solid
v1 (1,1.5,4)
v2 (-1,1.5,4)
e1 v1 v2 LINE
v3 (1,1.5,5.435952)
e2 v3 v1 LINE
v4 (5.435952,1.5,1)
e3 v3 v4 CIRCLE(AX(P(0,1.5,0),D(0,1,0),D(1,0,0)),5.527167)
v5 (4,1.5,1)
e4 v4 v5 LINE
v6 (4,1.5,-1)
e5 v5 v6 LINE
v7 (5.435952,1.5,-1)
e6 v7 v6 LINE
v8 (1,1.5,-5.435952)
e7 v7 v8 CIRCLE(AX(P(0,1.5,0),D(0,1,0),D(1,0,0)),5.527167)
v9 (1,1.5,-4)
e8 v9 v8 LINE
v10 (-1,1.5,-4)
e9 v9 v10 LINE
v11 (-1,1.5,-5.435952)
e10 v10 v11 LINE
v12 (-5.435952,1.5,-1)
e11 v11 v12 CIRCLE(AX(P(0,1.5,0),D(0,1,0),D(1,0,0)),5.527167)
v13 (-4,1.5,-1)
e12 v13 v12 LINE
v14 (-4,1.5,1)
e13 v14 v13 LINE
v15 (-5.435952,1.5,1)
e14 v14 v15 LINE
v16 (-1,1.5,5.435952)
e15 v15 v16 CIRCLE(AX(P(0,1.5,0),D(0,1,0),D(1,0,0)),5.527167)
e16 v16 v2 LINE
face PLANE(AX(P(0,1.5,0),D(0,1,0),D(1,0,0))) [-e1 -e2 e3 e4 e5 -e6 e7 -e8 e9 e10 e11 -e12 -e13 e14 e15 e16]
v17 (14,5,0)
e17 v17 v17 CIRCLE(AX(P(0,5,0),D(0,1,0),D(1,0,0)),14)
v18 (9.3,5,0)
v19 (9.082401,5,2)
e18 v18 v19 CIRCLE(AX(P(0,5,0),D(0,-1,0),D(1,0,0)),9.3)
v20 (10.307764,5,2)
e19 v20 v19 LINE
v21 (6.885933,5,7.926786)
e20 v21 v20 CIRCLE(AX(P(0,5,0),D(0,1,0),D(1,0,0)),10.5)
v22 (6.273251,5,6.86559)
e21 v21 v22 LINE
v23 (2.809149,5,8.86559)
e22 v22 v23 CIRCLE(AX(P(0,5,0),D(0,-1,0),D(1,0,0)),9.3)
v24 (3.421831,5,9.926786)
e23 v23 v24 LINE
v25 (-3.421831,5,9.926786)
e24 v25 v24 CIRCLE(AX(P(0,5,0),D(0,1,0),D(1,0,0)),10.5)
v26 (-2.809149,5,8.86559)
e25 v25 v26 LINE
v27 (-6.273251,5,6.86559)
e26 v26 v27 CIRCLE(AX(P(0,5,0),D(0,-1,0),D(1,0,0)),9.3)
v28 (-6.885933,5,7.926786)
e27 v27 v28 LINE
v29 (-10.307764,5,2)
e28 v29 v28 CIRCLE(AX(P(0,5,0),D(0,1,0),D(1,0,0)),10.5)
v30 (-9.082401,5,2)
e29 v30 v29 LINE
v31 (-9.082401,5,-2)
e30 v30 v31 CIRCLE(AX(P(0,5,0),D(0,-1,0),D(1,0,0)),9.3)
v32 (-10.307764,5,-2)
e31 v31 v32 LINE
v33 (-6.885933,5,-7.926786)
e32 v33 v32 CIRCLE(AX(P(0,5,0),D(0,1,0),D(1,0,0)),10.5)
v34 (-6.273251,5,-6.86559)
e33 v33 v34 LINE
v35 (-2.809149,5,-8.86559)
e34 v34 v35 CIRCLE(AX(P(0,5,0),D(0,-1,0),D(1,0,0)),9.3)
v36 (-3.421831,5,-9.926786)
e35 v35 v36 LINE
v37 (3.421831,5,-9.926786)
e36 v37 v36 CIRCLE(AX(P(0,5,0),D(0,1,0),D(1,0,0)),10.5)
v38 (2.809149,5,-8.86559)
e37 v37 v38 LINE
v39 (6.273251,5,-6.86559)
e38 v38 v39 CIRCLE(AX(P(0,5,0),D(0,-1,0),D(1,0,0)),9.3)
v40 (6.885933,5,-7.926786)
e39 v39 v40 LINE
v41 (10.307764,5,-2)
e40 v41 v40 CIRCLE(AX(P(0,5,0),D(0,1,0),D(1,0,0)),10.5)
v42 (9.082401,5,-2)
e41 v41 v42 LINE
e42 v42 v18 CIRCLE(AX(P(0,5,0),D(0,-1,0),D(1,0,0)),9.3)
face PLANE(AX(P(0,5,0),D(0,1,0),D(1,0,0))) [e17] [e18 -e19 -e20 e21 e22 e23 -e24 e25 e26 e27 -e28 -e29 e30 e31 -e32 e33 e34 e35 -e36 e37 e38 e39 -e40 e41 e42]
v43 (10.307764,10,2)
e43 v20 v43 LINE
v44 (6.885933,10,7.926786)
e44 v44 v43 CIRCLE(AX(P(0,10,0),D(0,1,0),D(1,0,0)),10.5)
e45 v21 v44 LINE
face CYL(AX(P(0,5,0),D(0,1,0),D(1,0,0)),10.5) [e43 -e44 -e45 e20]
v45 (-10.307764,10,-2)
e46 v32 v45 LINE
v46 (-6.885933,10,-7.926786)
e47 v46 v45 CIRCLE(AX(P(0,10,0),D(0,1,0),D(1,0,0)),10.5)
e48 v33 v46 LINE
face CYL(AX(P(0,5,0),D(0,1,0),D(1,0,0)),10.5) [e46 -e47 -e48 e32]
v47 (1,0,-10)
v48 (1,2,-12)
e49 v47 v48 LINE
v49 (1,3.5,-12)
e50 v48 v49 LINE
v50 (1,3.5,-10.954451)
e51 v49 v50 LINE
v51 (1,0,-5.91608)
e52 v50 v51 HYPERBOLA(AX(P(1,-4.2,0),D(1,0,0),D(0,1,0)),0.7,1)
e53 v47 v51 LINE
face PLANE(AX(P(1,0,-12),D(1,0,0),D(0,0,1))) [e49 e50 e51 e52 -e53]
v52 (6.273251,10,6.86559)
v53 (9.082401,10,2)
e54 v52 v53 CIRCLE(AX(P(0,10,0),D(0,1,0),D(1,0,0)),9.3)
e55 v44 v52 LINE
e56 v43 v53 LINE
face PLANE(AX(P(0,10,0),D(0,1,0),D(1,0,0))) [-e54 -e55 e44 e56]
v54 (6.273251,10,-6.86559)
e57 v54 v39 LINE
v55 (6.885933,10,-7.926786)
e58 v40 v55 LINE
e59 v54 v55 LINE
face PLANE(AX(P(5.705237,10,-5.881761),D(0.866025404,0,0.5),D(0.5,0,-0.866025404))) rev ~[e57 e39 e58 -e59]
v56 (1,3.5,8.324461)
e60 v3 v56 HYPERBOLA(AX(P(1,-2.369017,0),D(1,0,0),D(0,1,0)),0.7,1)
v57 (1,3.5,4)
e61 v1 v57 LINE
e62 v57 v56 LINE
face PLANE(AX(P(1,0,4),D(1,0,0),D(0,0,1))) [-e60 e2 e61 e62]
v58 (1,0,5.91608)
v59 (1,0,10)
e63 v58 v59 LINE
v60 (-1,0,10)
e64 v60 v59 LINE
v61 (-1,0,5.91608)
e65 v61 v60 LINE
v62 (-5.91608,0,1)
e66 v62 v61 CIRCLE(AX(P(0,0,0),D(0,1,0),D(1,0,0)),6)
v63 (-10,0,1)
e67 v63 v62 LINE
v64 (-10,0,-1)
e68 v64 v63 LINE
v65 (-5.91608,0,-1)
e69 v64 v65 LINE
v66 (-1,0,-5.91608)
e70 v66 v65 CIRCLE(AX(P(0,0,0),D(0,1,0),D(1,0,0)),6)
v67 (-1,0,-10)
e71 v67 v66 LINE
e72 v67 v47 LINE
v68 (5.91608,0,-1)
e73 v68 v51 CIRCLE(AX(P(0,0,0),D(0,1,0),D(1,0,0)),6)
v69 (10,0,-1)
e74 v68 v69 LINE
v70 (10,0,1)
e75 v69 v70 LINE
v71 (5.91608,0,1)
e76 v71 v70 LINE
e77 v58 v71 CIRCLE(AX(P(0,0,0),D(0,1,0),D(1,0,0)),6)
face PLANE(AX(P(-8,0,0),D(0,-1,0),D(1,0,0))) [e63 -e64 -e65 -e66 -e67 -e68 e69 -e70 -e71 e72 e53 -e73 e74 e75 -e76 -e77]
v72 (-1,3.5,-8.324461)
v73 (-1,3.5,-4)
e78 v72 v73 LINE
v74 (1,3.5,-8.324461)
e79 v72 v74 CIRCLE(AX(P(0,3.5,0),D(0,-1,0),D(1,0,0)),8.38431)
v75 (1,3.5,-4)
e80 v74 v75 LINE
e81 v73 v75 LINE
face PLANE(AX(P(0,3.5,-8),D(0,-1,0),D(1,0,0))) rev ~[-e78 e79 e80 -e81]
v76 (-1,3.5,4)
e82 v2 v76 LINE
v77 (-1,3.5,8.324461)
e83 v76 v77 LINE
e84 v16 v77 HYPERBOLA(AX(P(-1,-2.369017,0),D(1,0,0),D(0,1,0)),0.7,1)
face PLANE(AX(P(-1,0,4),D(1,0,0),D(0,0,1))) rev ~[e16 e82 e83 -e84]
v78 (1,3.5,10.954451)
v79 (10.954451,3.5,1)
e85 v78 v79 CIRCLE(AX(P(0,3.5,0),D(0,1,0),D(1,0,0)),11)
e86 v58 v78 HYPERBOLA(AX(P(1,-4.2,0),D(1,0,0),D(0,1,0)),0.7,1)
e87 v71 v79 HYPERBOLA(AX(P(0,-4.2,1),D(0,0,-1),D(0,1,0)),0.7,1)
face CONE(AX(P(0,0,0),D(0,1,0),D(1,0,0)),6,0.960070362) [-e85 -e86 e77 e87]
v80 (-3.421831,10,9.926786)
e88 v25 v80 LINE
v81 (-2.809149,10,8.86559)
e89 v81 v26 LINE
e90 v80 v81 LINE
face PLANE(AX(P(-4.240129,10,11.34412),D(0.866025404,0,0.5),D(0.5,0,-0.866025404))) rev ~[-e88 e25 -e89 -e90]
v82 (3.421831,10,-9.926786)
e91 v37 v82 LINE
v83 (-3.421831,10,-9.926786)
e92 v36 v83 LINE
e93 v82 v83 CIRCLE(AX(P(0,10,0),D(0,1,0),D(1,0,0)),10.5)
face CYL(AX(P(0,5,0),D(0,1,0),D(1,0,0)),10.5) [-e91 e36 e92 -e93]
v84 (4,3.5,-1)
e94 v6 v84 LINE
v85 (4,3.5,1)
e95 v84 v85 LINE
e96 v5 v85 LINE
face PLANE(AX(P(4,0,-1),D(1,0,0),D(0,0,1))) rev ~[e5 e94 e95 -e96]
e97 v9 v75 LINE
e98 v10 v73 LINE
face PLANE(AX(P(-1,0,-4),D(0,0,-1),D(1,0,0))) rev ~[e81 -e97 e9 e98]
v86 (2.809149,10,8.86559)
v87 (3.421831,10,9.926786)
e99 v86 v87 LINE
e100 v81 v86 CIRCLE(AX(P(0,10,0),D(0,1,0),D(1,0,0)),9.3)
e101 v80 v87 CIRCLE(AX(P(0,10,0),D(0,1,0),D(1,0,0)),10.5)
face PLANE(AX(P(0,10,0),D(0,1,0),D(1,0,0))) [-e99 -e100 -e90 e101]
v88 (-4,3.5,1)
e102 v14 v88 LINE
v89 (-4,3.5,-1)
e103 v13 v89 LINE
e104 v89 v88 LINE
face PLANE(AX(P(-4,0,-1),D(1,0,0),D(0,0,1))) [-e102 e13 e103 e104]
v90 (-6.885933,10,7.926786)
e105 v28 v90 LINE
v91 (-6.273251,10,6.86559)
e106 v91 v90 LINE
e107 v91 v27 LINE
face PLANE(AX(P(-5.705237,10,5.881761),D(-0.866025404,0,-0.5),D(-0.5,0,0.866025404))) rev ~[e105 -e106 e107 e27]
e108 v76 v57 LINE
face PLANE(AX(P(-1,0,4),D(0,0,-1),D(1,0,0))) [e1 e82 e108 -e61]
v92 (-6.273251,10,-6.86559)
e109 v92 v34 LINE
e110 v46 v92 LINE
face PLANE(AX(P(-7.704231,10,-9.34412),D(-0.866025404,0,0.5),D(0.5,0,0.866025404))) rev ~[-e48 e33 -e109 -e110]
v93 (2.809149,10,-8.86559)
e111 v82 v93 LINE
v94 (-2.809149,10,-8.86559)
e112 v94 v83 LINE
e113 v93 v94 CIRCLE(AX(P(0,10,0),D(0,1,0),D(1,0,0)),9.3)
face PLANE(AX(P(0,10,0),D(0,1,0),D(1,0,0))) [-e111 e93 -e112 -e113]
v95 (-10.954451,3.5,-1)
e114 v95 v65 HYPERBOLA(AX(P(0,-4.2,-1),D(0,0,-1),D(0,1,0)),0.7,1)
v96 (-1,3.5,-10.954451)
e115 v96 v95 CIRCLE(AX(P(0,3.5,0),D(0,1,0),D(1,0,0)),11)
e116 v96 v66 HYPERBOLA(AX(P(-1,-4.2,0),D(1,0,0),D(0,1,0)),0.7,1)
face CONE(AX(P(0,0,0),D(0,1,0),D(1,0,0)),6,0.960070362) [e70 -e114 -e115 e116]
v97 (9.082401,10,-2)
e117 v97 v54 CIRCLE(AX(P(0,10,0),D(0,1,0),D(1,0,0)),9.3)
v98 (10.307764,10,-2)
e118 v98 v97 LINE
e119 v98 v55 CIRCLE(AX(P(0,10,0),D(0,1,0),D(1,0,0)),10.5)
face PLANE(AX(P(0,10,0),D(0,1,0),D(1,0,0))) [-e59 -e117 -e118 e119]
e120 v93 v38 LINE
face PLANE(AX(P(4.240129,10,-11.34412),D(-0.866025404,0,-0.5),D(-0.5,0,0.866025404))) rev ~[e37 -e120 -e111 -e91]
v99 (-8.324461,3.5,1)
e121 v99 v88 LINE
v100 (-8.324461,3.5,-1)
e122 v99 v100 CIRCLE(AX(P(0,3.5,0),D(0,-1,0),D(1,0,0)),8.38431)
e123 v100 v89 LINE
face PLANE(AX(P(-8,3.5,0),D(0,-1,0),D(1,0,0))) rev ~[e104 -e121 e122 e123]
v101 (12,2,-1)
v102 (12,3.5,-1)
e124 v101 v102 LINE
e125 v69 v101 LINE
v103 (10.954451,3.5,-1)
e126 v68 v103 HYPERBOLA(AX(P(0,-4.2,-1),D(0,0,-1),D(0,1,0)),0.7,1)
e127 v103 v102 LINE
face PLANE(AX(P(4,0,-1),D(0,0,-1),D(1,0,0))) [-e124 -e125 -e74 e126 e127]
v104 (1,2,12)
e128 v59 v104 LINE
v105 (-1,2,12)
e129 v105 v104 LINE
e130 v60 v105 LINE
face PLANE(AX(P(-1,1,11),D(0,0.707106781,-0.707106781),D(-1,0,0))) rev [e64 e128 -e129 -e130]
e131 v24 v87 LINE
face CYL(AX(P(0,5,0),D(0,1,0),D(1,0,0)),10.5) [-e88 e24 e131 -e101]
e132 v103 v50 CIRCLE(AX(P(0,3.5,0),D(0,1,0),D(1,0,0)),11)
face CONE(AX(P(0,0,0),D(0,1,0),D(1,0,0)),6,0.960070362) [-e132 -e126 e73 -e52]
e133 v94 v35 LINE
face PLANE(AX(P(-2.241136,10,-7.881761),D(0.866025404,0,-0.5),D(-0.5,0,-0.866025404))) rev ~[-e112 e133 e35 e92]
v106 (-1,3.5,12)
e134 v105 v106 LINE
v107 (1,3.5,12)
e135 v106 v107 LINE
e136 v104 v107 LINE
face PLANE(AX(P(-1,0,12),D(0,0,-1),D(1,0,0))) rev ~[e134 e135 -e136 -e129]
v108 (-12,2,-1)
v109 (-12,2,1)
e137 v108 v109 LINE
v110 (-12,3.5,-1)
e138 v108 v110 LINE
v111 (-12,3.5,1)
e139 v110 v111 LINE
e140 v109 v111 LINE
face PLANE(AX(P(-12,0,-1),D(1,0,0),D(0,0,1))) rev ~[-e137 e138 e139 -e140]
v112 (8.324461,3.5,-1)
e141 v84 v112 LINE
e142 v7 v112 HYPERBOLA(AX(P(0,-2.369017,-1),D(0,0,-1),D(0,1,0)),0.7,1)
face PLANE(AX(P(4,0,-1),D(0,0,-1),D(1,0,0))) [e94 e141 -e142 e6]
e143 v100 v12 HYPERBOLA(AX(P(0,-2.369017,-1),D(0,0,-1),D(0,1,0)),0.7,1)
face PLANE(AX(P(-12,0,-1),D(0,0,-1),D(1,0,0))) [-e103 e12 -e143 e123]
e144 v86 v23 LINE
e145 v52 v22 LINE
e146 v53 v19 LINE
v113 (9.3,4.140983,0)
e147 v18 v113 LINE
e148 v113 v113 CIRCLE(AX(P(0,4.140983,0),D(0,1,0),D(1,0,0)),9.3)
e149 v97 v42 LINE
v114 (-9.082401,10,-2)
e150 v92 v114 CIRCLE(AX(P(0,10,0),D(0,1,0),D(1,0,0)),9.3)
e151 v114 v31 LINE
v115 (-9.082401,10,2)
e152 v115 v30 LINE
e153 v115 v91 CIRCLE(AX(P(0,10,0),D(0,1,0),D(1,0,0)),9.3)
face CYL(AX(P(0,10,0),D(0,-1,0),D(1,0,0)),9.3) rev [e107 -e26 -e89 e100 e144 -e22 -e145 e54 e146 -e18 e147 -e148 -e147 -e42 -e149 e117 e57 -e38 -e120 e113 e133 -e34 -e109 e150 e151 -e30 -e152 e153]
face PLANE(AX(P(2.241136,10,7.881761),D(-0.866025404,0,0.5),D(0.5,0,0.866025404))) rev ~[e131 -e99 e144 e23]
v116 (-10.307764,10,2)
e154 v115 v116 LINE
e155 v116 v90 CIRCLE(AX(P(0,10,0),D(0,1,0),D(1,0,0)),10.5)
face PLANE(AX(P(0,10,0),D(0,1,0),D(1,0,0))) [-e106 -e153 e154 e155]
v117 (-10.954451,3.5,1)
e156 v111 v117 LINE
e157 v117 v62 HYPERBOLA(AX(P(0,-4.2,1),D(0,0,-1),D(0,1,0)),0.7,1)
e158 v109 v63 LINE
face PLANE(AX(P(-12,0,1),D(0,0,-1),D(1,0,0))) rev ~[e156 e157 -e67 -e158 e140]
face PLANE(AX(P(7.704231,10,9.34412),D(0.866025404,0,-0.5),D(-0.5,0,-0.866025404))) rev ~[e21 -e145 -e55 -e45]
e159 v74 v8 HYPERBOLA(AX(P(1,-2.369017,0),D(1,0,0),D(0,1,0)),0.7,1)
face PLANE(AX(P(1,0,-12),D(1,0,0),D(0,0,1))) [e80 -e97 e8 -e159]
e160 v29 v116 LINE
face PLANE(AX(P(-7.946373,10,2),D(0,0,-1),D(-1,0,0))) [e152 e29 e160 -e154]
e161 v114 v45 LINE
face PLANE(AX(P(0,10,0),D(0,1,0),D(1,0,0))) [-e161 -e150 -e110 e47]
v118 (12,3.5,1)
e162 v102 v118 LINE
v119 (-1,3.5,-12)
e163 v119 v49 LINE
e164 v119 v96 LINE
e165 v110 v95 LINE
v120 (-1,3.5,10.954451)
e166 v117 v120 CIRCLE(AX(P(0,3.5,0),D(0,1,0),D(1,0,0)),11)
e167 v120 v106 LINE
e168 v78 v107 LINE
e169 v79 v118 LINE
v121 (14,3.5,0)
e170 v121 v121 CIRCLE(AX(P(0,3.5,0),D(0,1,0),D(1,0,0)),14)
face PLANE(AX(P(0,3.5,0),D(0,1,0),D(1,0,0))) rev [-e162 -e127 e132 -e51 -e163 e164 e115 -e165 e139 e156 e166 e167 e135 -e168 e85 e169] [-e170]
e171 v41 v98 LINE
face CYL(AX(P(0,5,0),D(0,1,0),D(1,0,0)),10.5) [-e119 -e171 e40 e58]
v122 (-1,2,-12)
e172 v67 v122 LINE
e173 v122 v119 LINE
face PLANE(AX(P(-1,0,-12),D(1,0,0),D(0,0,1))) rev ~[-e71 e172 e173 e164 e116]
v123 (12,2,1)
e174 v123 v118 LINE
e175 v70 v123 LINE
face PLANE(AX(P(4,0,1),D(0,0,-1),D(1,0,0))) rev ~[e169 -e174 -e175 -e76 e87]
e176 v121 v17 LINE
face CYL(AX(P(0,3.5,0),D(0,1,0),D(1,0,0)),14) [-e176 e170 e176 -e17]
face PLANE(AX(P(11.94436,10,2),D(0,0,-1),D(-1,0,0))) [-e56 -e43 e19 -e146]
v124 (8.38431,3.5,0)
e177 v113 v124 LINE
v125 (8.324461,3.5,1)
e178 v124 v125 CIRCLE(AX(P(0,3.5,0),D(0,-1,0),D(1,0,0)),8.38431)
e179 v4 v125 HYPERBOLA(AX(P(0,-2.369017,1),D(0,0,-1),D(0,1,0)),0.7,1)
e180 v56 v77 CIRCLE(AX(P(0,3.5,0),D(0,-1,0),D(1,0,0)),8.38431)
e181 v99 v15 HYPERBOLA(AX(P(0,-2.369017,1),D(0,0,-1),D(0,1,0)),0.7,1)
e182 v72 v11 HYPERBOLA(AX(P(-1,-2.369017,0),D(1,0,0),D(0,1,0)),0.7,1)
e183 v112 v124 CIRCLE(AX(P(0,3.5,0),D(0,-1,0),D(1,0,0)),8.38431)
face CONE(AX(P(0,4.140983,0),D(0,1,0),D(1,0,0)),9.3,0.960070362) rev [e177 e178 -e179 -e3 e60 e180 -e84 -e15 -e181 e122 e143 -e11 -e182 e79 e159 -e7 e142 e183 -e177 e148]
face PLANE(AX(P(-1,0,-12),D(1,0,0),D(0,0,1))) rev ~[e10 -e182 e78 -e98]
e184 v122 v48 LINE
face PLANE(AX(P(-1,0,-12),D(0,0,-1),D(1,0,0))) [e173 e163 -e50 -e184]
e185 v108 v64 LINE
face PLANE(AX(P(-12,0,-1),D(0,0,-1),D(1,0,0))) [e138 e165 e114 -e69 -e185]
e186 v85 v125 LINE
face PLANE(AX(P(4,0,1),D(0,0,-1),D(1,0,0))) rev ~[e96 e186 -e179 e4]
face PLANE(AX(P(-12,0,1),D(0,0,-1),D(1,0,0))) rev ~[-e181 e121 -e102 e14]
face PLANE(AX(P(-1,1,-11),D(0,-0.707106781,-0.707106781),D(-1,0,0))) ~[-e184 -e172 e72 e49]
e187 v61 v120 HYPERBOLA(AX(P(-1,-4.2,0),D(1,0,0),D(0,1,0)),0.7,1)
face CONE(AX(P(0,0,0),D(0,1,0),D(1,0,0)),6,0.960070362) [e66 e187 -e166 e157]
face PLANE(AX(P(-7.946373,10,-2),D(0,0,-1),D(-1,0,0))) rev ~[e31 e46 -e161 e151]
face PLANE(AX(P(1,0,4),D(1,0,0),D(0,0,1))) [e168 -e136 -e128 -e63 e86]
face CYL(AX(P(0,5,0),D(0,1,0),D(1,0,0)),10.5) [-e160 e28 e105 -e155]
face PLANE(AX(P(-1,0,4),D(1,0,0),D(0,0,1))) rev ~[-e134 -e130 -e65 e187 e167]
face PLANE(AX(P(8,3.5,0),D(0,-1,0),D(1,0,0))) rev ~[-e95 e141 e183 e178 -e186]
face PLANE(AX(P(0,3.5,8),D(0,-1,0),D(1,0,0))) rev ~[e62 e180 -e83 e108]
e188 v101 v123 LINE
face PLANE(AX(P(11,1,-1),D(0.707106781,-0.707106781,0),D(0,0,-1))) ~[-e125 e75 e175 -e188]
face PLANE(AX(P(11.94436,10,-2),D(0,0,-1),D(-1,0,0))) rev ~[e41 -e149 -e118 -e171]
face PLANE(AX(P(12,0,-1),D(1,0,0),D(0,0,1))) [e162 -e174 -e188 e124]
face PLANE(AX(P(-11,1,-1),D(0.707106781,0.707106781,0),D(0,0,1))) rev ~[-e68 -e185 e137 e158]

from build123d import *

# Parameters (mm, degrees)
F2_W     = 3.9979876956
F2_H     = 4
F3_DEPTH = 5
F4_W     = 8
F4_H     = 2
F4_W_2   = 2
F4_H_2   = 8
F5_DEPTH = 3.5
F6_SIZE  = 2


with BuildPart() as f1:
    # F0 (on Top) → F1 (revolve)
    with BuildSketch(Plane.XY):
        Polygon((0, 1.5), (0, 0), (6, 0), (11, 3.5), (14, 3.5), (14, 5), (10.5, 5), (10.5, 10), (9.3, 10), (9.3, 4.1409833424), (5.5271666538, 1.5), align=None)
    revolve(axis=Axis((0, 5.6900531054, 0), (0, 1, 0)))

    # F2 (on face) → F3 (cut, through all)
    with BuildSketch(Plane(origin=(0, 10, 0), x_dir=(-1, 0, 0), z_dir=(0, 1, 0))):
        with Locations((9.9453665316, 0)):
            Rectangle(F2_W, F2_H)
        Polygon((4.2401293821, 11.3441195205), (2.2411355343, 7.8817606121), (5.7052371495, 5.8817606121), (7.7042309973, 9.3441195205), align=None)
        Polygon((-7.7042309973, 9.3441195205), (-5.7052371495, 5.8817606121), (-2.2411355343, 7.8817606121), (-4.2401293821, 11.3441195205), align=None)
        with Locations((-9.9453665316, 0)):
            Rectangle(F2_W, F2_H)
        Polygon((-4.2401293821, -11.3441195205), (-2.2411355343, -7.8817606121), (-5.7052371495, -5.8817606121), (-7.7042309973, -9.3441195205), align=None)
        Polygon((7.7042309973, -9.3441195205), (5.7052371495, -5.8817606121), (2.2411355343, -7.8817606121), (4.2401293821, -11.3441195205), align=None)
    extrude(amount=-F3_DEPTH, mode=Mode.SUBTRACT)

    # F4 (on face) → F5 (join, through all)
    with BuildSketch(Plane.XZ):
        with Locations((-8, 0)):
            Rectangle(F4_W, F4_H)
        with Locations((0, -8)):
            Rectangle(F4_W_2, F4_H_2)
        with Locations((8, 0)):
            Rectangle(F4_W, F4_H)
        with Locations((0, 8)):
            Rectangle(F4_W_2, F4_H_2)
    extrude(amount=-F5_DEPTH)

    # F6
    f6_edges = [f1.edges().sort_by_distance(p)[0] for p in [
        (-12, 0, 0),
        (0, 0, -12),
        (12, 0, 0),
        (0, 0, 12),
    ]]
    chamfer(f6_edges, length=F6_SIZE)


solid = f1.part
